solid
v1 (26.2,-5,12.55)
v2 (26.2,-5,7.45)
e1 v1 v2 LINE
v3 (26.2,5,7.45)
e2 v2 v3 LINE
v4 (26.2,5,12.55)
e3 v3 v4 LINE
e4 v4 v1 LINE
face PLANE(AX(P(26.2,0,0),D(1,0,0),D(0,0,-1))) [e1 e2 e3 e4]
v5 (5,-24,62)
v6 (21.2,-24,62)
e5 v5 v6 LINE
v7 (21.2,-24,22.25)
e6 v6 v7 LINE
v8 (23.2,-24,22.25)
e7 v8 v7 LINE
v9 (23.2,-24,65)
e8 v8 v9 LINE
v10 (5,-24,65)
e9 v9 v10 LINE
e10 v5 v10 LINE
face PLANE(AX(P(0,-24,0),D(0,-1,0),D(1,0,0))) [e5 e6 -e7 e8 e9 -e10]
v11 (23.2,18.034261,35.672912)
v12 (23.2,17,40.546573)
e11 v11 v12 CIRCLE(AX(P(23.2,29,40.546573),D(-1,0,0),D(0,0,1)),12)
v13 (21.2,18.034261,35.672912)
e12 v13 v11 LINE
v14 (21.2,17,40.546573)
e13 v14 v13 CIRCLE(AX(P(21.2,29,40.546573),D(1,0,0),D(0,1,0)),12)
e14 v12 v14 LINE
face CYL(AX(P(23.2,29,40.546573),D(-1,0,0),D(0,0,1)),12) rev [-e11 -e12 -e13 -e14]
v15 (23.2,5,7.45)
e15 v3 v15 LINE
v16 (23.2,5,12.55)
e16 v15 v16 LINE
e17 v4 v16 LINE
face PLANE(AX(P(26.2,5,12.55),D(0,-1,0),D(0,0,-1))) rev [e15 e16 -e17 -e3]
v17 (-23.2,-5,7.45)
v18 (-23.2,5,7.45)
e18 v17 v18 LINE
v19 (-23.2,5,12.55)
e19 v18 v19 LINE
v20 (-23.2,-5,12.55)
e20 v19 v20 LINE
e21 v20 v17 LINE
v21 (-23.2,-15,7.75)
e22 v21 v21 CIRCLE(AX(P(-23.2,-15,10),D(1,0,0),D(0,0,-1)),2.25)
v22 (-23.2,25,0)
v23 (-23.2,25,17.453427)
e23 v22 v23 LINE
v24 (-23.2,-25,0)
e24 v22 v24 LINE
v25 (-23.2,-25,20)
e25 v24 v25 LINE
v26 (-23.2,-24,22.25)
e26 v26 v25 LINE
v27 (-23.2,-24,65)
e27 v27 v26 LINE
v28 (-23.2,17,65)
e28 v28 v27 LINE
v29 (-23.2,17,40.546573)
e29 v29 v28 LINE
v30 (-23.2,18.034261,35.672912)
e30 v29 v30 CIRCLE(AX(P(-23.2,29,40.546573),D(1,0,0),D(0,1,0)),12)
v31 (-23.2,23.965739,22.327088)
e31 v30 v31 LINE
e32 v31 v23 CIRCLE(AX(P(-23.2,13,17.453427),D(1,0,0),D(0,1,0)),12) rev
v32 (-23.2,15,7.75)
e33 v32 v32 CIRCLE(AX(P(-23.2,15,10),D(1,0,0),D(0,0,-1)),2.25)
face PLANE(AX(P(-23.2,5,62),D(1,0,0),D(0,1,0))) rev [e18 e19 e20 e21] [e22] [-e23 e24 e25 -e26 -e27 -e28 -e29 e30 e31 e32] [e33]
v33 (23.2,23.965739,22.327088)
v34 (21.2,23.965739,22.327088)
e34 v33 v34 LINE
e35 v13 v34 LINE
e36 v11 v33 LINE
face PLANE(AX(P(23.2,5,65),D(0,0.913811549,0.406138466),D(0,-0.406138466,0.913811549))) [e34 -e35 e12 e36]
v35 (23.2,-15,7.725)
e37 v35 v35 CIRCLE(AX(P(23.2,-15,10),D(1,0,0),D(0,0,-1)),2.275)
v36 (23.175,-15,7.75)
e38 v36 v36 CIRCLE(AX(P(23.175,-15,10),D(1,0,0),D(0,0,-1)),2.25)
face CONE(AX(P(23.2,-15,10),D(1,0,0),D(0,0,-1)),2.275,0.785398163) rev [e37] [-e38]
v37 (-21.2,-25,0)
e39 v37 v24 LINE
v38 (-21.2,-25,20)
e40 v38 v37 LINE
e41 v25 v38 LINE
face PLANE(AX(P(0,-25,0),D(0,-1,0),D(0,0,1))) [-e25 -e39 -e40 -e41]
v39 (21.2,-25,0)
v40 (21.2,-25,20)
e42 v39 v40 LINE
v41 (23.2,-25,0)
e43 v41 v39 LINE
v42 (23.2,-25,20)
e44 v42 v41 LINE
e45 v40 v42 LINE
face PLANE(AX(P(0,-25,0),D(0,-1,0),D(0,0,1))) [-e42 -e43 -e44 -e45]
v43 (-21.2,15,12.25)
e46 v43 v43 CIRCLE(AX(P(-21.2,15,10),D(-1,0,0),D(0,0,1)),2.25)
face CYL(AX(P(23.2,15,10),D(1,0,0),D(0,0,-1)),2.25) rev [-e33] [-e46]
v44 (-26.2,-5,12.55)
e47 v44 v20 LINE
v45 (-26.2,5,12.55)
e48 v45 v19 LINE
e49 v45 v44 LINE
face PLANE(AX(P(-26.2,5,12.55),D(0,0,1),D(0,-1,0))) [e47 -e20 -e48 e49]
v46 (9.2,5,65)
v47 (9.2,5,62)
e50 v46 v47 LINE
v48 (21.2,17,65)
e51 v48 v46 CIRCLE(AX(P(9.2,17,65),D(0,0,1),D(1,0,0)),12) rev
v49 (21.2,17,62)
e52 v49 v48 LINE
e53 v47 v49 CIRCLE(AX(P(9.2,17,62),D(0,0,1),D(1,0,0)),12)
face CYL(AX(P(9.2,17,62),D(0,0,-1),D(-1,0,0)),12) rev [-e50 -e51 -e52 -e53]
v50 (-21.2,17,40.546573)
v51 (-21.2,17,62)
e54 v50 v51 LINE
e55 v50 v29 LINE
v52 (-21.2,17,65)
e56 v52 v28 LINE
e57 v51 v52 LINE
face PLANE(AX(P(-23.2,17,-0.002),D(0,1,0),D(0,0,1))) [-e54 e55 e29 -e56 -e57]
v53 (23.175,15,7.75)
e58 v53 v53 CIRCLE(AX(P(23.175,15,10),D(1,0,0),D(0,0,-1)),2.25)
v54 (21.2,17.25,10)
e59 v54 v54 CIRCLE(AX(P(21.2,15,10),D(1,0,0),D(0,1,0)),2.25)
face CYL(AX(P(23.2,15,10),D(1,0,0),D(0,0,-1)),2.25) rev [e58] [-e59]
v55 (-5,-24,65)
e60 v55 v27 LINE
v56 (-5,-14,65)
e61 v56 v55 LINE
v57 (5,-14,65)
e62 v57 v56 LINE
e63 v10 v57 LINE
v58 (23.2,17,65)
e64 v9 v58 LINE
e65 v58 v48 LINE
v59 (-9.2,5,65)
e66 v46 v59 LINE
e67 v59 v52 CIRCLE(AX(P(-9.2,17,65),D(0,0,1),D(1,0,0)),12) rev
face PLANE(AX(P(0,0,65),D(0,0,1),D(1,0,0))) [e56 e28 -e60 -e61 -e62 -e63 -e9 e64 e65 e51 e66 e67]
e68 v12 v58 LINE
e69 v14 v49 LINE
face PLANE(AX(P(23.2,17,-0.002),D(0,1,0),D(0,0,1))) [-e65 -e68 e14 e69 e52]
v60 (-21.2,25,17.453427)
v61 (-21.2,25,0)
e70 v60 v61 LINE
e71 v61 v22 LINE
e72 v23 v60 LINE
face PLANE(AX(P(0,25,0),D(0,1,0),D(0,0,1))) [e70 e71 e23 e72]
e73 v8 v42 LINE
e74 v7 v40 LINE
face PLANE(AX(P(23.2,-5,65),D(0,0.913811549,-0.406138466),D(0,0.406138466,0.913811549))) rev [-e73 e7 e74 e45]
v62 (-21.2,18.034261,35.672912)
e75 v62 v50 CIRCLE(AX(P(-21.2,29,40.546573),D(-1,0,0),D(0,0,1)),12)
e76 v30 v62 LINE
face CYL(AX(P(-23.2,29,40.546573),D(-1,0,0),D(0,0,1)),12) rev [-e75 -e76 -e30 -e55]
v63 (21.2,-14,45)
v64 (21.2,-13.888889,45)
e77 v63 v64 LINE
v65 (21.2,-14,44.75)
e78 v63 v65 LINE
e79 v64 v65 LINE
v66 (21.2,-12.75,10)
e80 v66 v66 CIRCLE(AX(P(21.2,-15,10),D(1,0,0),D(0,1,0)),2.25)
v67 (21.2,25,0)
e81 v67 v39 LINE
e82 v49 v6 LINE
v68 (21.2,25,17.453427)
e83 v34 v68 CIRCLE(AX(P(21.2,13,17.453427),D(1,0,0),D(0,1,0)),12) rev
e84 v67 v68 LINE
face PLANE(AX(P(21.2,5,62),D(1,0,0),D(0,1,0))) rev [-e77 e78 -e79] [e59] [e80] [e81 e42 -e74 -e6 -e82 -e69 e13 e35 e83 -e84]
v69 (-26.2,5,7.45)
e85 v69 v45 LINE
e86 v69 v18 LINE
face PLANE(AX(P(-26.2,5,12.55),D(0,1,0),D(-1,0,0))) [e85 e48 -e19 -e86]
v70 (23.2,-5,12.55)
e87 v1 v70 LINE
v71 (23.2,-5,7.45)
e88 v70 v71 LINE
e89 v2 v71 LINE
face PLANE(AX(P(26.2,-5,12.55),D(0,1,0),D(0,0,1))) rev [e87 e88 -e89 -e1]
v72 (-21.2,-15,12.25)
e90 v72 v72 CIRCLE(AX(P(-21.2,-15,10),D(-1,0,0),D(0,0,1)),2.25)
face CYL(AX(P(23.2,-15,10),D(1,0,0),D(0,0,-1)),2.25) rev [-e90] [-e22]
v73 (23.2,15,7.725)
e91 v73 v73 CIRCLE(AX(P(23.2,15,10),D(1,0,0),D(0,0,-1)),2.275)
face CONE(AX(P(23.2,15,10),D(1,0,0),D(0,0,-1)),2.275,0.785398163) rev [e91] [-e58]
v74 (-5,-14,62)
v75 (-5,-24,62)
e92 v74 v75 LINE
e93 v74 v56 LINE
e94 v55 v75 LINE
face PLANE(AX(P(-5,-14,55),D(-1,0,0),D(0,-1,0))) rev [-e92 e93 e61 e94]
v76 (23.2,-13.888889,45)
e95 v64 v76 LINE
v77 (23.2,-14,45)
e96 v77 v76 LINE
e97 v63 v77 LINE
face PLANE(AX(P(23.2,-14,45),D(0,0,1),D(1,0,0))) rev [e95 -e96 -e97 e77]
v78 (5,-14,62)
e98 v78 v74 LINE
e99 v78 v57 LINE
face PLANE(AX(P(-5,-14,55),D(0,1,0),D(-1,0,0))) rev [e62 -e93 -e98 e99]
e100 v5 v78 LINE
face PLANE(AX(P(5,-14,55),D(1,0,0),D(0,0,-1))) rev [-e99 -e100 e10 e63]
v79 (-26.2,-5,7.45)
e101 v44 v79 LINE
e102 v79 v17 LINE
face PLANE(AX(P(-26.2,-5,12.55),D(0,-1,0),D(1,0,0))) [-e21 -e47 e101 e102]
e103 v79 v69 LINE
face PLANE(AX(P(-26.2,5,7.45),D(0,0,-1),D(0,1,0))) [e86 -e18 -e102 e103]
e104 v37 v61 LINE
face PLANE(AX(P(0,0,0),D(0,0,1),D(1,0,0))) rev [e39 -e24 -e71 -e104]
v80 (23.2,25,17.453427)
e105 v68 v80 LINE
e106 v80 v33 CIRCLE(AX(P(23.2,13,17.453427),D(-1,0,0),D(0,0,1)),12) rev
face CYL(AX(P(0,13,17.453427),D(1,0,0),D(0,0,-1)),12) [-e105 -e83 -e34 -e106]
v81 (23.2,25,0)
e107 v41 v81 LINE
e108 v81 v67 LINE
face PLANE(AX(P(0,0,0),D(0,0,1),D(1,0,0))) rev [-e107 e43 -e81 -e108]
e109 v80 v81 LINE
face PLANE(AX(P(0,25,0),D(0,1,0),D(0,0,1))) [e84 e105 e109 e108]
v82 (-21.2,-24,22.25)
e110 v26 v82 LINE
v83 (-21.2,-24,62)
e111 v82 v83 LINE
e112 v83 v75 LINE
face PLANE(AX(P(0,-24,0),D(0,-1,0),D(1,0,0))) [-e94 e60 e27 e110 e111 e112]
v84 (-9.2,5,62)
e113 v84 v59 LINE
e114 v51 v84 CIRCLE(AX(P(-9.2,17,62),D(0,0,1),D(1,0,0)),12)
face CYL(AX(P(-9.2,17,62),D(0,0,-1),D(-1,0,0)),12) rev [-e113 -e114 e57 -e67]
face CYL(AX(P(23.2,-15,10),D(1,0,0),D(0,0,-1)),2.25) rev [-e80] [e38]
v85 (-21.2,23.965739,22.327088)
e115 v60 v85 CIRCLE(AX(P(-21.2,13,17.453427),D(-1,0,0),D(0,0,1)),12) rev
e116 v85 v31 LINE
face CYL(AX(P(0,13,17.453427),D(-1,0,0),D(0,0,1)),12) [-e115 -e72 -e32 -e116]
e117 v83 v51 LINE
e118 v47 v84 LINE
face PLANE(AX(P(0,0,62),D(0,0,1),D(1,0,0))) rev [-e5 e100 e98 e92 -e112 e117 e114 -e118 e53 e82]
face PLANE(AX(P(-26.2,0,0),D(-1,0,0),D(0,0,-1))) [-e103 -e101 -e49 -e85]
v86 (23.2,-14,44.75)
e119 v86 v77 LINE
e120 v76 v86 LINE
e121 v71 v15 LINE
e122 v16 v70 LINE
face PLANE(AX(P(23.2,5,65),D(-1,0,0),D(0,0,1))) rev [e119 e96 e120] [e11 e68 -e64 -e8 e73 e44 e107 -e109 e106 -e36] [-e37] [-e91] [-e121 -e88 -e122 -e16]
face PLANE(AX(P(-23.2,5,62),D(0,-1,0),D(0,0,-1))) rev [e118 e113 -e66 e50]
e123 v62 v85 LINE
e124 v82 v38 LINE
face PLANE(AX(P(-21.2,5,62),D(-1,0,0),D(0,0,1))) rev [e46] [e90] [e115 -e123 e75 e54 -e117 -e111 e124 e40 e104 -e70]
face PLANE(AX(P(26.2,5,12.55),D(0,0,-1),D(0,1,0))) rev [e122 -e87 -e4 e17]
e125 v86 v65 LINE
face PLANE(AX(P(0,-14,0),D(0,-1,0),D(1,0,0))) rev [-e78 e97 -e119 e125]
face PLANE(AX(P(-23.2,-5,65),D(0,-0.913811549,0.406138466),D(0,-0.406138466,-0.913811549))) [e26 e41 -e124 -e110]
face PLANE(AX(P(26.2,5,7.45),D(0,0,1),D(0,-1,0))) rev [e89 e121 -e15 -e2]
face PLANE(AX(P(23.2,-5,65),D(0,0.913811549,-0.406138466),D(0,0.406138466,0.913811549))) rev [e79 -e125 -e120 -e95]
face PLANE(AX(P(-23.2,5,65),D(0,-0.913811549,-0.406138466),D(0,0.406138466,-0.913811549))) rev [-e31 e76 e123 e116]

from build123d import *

# Parameters (mm, degrees)
SKETCH_1_W                   = 2
SKETCH_1_H                   = 10
EXTRUDE_1_DEPTH              = 62
EXTRUDE_1_2_DEPTH            = 62
SKETCH_2_W                   = 46.4
SKETCH_2_H                   = 10
EXTRUDE_2_DEPTH              = 3
SKETCH_3_W                   = 2
SKETCH_3_H                   = 20
EXTRUDE_3_DEPTH              = 20
EXTRUDE_4_DEPTH              = 2
MIRROR_3_COPY_1_SKETCH_W     = 2
MIRROR_3_COPY_1_SKETCH_H     = 20
MIRROR_3_COPY_1_DEPTH        = 20
MIRROR_3_COPY_2_DEPTH        = 2
MIRROR_3_COPY_3_SKETCH_W     = 2
MIRROR_3_COPY_3_SKETCH_H     = 20
MIRROR_3_COPY_3_DEPTH        = 20
EXTRUDE_5_DEPTH              = 9
HOLE_WIZARD_M4_1_D           = 4.5
HOLE_WIZARD_M4_1_CSINK_D     = 4.55
HOLE_WIZARD_M4_1_CSINK_ANGLE = 90
SKETCH_10_W                  = 5.1
SKETCH_10_H                  = 10
EXTRUDE_6_DEPTH              = 3
EXTRUDE_7_DEPTH              = 10
EXTRUDE_8_REACH              = 76.407
SKETCH_12_W                  = 2
SKETCH_12_H                  = 22
SKETCH_13_W                  = 10
SKETCH_13_H                  = 10
CUT_EXTRUDE_1_DEPTH          = 10
FILLET_1_R                   = 12
FILLET_2_R                   = 12


with BuildPart() as part:
    # 스케치1 → 보스-돌출1 (new body)
    with BuildSketch(Plane.XY):
        with Locations((-22.2, 0)):
            Rectangle(SKETCH_1_W, SKETCH_1_H)
    extrude(amount=EXTRUDE_1_DEPTH)



with BuildPart() as body_2:
    # 스케치1 → Extrude 1 2 (new body)
    with BuildSketch(Plane.XY):
        with Locations((22.2, 0)):
            Rectangle(SKETCH_1_W, SKETCH_1_H)
    extrude(amount=EXTRUDE_1_2_DEPTH)


with BuildPart() as part_1:
    add(part.part)

    add(body_2.part)  # 보스-돌출2 merges body 2
    # 스케치2 → 보스-돌출2 (add)
    with BuildSketch(Plane.XY.offset(62)):
        Rectangle(SKETCH_2_W, SKETCH_2_H)
    extrude(amount=EXTRUDE_2_DEPTH)

    # 스케치3 → 보스-돌출3 (add)
    with BuildSketch(Plane(origin=(0, 5, 0), x_dir=(1, 0, 0), z_dir=(0, 1, 0))):
        with Locations((-22.2, -10)):
            Rectangle(SKETCH_3_W, SKETCH_3_H)
        with Locations((22.2, -10)):
            Rectangle(SKETCH_3_W, SKETCH_3_H)
    extrude_3 = extrude(amount=EXTRUDE_3_DEPTH)

    # 스케치4 → 보스-돌출4 (add)
    with BuildSketch(Plane.ZY.offset(-21.2)):
        Polygon((20, 25), (20, 5), (65, 5), align=None)
    extrude_4 = extrude(amount=-EXTRUDE_4_DEPTH)

    # 대칭 복사1: 보스-돌출3, 보스-돌출4 across plane
    add(extrude_3.mirror(Plane.ZX))
    add(extrude_4.mirror(Plane.ZX))

    # 대칭 복사3: 보스-돌출4 across plane
    add(extrude_4.mirror(Plane.ZY))

    # 대칭 복사3 copy 1 sketch → 대칭 복사3 copy 1 (add)
    with BuildSketch(Plane(origin=(0, -5, 0), x_dir=(-1, 0, 0), z_dir=(0, -1, 0))):
        with Locations((-22.2, -10)):
            Rectangle(MIRROR_3_COPY_1_SKETCH_W, MIRROR_3_COPY_1_SKETCH_H)
        with Locations((22.2, -10)):
            Rectangle(MIRROR_3_COPY_1_SKETCH_W, MIRROR_3_COPY_1_SKETCH_H)
    extrude(amount=MIRROR_3_COPY_1_DEPTH)

    # 대칭 복사3 copy 2 sketch → 대칭 복사3 copy 2 (add)
    with BuildSketch(Plane(origin=(-21.2, 0, 0), x_dir=(0, 0, 1), z_dir=(1, 0, 0))):
        Polygon((20, 25), (20, 5), (65, 5), align=None)
    extrude(amount=-MIRROR_3_COPY_2_DEPTH)

    # 대칭 복사3 copy 3 sketch → 대칭 복사3 copy 3 (add)
    with BuildSketch(Plane(origin=(0, 5, 0), x_dir=(-1, 0, 0), z_dir=(0, 1, 0))):
        with Locations((-22.2, 10)):
            Rectangle(MIRROR_3_COPY_3_SKETCH_W, MIRROR_3_COPY_3_SKETCH_H)
        with Locations((22.2, 10)):
            Rectangle(MIRROR_3_COPY_3_SKETCH_W, MIRROR_3_COPY_3_SKETCH_H)
    extrude(amount=MIRROR_3_COPY_3_DEPTH)

    # 스케치6 → 보스-돌출5 (add)
    with BuildSketch(Plane.XZ.offset(5)):
        Polygon((-23.2, 65), (-23.2, 44.637351208), (-21.2, 44.637351208), (-21.2, 62), (21.2, 62), (21.2, 45), (23.2, 45), (23.2, 65), align=None)
    extrude(amount=EXTRUDE_5_DEPTH)

    # M4 여유 구멍1 (through all)
    with Locations(Plane(origin=(23.2, 0, 0), x_dir=(0, 0, -1), z_dir=(1, 0, 0))):
        with Locations((-10, -15), (-10, 15)):
            CounterSinkHole(HOLE_WIZARD_M4_1_D / 2, HOLE_WIZARD_M4_1_CSINK_D / 2, counter_sink_angle=HOLE_WIZARD_M4_1_CSINK_ANGLE)

    # 스케치10 → 보스-돌출6 (add)
    with BuildSketch(Plane(origin=(23.2, 0, 0), x_dir=(0, 0, -1), z_dir=(1, 0, 0))):
        with Locations((-10, 0)):
            Rectangle(SKETCH_10_W, SKETCH_10_H)
    extrude_6 = extrude(amount=EXTRUDE_6_DEPTH)

    # 대칭 복사4: 보스-돌출6 across plane
    add(extrude_6.mirror(Plane.ZY))

    # 스케치11 → 보스-돌출7 (add)
    with BuildSketch(Plane.XZ.offset(14)):
        Polygon((-23.2, 15), (-21.2, 15), (-21.2, 62), (21.2, 62), (21.2, 15), (23.2, 15), (23.2, 65), (-23.2, 65), align=None)
    extrude(amount=EXTRUDE_7_DEPTH)

    # 스케치12 → 보스-돌출8 (add, up to next)
    with BuildSketch(Plane.XY.offset(65), mode=Mode.PRIVATE) as extrude_8_sk1:
        with Locations((-22.2, 6)):
            Rectangle(SKETCH_12_W, SKETCH_12_H)
    extrude_8_tool1 = extrude(extrude_8_sk1.sketch, amount=-EXTRUDE_8_REACH, mode=Mode.PRIVATE) - part_1.part
    # 스케치12 → 보스-돌출8 (add, up to next)
    with BuildSketch(Plane.XY.offset(65), mode=Mode.PRIVATE) as extrude_8_sk2:
        with Locations((22.2, 6)):
            Rectangle(SKETCH_12_W, SKETCH_12_H)
    extrude_8_tool2 = extrude(extrude_8_sk2.sketch, amount=-EXTRUDE_8_REACH, mode=Mode.PRIVATE) - part_1.part
    add(extrude_8_tool1.solids().sort_by_distance((-22.2, 6, 65))[0])
    add(extrude_8_tool2.solids().sort_by_distance((22.2, 6, 65))[0])

    # 스케치13 → 컷-돌출1 (cut)
    with BuildSketch(Plane.XY.offset(65)):
        with Locations((0, -19)):
            Rectangle(SKETCH_13_W, SKETCH_13_H)
    extrude(amount=-CUT_EXTRUDE_1_DEPTH, mode=Mode.SUBTRACT)

    # 필렛1
    fillet_1_edges = [part_1.edges().sort_by_distance(p)[0] for p in [
        (21.2, 5, 63.5),
        (-21.2, 5, 63.5),
    ]]
    fillet(fillet_1_edges, radius=FILLET_1_R - 0.0001)  # a hair under: the kernel refuses the full size

    # 필렛2
    fillet_2_edges = [part_1.edges().sort_by_distance(p)[0] for p in [
        (-22.2, 17, 38),
        (22.2, 17, 38),
        (-22.2, 25, 20),
        (22.2, 25, 20),
    ]]
    fillet(fillet_2_edges, radius=FILLET_2_R)


solid = part_1.part
